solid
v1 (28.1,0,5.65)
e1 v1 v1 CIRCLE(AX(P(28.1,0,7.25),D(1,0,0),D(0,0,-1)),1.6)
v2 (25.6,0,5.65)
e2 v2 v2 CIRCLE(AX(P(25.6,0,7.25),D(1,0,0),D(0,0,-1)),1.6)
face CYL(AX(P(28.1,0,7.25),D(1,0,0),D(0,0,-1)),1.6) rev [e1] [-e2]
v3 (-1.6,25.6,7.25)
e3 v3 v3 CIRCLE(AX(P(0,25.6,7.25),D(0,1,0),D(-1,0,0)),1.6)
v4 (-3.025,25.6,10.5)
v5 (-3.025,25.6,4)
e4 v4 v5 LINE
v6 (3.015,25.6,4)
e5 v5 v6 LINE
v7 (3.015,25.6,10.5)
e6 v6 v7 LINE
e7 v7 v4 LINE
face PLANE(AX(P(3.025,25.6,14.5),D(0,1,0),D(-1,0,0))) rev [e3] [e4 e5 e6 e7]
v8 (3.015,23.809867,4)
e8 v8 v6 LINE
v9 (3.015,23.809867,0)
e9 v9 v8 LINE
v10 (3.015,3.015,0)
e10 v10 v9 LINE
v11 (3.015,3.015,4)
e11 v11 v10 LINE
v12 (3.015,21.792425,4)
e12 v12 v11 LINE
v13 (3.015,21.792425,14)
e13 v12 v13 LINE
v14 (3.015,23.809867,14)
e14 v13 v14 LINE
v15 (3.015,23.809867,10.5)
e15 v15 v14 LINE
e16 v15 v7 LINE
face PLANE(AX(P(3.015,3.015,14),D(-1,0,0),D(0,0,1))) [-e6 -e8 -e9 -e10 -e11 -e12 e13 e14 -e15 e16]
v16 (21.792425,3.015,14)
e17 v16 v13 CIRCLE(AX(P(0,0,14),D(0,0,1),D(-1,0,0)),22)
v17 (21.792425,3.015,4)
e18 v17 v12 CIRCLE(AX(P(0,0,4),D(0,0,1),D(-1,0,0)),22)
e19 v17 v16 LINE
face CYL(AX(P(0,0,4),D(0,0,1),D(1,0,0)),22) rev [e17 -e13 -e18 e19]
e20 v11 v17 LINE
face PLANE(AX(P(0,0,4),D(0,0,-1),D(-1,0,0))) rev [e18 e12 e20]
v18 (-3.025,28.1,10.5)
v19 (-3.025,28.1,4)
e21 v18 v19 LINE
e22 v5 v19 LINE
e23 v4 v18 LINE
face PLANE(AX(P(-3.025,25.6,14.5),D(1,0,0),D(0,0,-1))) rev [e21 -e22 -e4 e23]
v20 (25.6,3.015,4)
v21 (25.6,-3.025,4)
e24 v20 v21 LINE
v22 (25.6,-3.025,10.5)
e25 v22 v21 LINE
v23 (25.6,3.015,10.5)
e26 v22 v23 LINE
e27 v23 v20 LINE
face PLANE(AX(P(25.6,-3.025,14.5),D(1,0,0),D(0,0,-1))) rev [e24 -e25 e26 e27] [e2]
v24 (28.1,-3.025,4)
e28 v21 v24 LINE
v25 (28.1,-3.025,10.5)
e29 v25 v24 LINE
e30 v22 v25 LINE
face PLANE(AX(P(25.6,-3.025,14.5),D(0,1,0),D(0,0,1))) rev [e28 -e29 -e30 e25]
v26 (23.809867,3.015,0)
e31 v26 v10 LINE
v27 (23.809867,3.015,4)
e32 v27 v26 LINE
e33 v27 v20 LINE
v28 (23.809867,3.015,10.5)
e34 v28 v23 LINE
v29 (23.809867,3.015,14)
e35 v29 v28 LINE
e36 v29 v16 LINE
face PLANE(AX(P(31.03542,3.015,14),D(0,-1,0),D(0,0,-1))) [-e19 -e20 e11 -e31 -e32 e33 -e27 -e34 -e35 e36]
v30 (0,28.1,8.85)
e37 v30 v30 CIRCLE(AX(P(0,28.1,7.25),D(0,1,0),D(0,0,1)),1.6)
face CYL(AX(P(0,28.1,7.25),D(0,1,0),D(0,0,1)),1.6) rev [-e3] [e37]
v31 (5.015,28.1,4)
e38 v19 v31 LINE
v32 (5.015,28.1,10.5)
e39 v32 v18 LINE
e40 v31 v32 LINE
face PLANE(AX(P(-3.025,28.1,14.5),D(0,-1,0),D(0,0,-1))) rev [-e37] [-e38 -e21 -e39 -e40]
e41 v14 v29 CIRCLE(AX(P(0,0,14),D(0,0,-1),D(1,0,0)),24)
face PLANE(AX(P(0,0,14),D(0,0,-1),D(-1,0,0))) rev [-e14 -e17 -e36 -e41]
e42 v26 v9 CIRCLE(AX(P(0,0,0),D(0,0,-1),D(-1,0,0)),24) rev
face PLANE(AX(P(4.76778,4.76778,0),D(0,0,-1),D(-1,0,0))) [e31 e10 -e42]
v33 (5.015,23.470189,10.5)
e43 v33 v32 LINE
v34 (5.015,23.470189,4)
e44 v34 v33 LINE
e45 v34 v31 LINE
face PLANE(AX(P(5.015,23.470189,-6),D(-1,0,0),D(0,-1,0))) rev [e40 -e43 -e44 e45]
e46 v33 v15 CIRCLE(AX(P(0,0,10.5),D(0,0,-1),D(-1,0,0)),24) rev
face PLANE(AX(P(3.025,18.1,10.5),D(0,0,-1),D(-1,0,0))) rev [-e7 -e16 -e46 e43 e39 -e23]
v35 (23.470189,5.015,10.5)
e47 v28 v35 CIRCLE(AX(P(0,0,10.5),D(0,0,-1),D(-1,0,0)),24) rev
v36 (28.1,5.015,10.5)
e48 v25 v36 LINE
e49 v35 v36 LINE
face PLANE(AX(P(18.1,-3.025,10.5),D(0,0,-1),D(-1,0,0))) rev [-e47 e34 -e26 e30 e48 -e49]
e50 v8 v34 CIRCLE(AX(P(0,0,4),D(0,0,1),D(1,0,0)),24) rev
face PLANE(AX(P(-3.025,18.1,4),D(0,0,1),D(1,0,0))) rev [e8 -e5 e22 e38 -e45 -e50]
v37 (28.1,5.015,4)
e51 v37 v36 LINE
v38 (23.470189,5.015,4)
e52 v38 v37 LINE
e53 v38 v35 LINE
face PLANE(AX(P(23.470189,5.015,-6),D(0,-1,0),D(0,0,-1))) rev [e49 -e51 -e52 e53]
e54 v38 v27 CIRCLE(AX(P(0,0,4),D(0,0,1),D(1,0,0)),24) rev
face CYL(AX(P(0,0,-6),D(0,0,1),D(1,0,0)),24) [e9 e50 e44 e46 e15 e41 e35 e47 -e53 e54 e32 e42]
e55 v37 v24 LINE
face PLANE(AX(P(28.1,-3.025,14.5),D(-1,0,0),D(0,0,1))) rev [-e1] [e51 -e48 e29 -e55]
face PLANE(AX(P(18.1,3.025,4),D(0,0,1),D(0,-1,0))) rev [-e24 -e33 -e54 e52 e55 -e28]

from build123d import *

# Parameters (mm, degrees)
BOSS_EXTRUDE1_DEPTH   = 14.5
M3_CLEARANCE_HOLE1_D  = 3.2
M3_CLEARANCE_HOLE2_D  = 3.2
SKETCH6_W             = 6.05
SKETCH6_H             = 4
CUT_EXTRUDE1_DEPTH    = 10
SKETCH7_W             = 4
SKETCH7_H             = 6.05
CUT_EXTRUDE2_DEPTH    = 10
BOSS_EXTRUDE7_DEPTH   = 14
SKETCH14_W            = 57.002666796
SKETCH14_H            = 41.192482136
CUT_EXTRUDE4_DEPTH    = 15
CUT_EXTRUDE5_DEPTH    = 10
CUT_EXTRUDE8_DEPTH    = 20
CUT_EXTRUDE9_DEPTH    = 4
CUT_EXTRUDE9_START    = 10.5
CUT_EXTRUDE9_2_DEPTH  = 3.5
CUT_EXTRUDE10_DEPTH   = 4
CUT_EXTRUDE10_START   = 10.5
CUT_EXTRUDE10_2_DEPTH = 3.5


# Read off the part's stored shape, not the designer's step: Cut-Extrude9, Cut-Extrude10
with BuildPart() as part:
    # Sketch1 → Boss-Extrude1 (new body)
    with BuildSketch(Plane.XY):
        with BuildLine():
            Line((3.025, 25.6), (-3.025, 25.6))
            Line((-3.025, 25.6), (-3.025, 28.1))
            Line((-3.025, 28.1), (3.025, 28.1))
            ThreePointArc((3.025, 28.1), (21.312111091, 21.312111091), (28.1, 3.025))
            Line((28.1, 3.025), (28.1, -3.025))
            Line((28.1, -3.025), (25.6, -3.025))
            Line((25.6, -3.025), (25.6, 3.025))
            ThreePointArc((25.6, 3.025), (18.987935585, 18.987935585), (3.025, 25.6))
        make_face()
    extrude(amount=BOSS_EXTRUDE1_DEPTH)

    # M3 Clearance Hole1 (through all)
    with Locations(Plane(origin=(0, 28.1, 0), x_dir=(1, 0, 0), z_dir=(0, 1, 0))):
        with Locations((0, -7.25)):
            Hole(M3_CLEARANCE_HOLE1_D / 2)

    # M3 Clearance Hole2 (through all)
    with Locations(Plane(origin=(28.1, 0, 0), x_dir=(0, 0, -1), z_dir=(1, 0, 0))):
        with Locations((-7.25, 0)):
            Hole(M3_CLEARANCE_HOLE2_D / 2)

    # Sketch6 → Cut-Extrude1 (cut)
    with BuildSketch(Plane(origin=(0, 28.1, 0), x_dir=(1, 0, 0), z_dir=(0, 1, 0))):
        with Locations((0, -12.5)):
            Rectangle(SKETCH6_W, SKETCH6_H)
        with Locations((0, -2)):
            Rectangle(SKETCH6_W, SKETCH6_H)
    extrude(amount=-CUT_EXTRUDE1_DEPTH, mode=Mode.SUBTRACT)

    # Sketch7 → Cut-Extrude2 (cut)
    with BuildSketch(Plane(origin=(28.1, 0, 0), x_dir=(0, 0, -1), z_dir=(1, 0, 0))):
        with Locations((-12.5, 0)):
            Rectangle(SKETCH7_W, SKETCH7_H)
        with Locations((-2, 0)):
            Rectangle(SKETCH7_W, SKETCH7_H)
    extrude(amount=-CUT_EXTRUDE2_DEPTH, mode=Mode.SUBTRACT)

    # Sketch8 → Boss-Extrude7 (add)
    with BuildSketch(Plane(origin=(0, 0, 0), x_dir=(-1, 0, 0), z_dir=(0, 0, -1))):
        with BuildLine():
            Line((-31.03541973, 3.015), (-3.015, 3.015))
            Line((-3.015, 3.015), (-3.015, 31.03541973))
            ThreePointArc((-3.015, 31.03541973), (-22.048667792, 22.048667792), (-31.03541973, 3.015))
        make_face()
    extrude(amount=-BOSS_EXTRUDE7_DEPTH)

    # Sketch14 → Cut-Extrude4 (cut)
    with BuildSketch(Plane.XY.offset(14)):
        with Locations((13.446699297, 19.415661607)):
            Rectangle(SKETCH14_W, SKETCH14_H)
    extrude(amount=CUT_EXTRUDE4_DEPTH, mode=Mode.SUBTRACT)

    # Sketch15 → Cut-Extrude5 (cut)
    with BuildSketch(Plane.XY.offset(14)):
        with BuildLine():
            Line((3.015, 21.792424716), (3.015, 3.015))
            Line((3.015, 3.015), (21.792424716, 3.015))
            ThreePointArc((21.792424716, 3.015), (15.556349186, 15.556349186), (3.015, 21.792424716))
        make_face()
    extrude(amount=-CUT_EXTRUDE5_DEPTH, mode=Mode.SUBTRACT)

    # Sketch16 → Cut-Extrude8 (cut)
    with BuildSketch(Plane.XY.offset(14)):
        with BuildLine():
            Line((5.015, 23.47018907), (5.015, 28.1))
            Line((5.015, 28.1), (3.015, 28.1))
            Line((3.015, 28.1), (3.015, 36.20716296))
            Line((3.015, 36.20716296), (34.30048071, 28.1))
            Line((34.30048071, 28.1), (32.410436515, 3.015))
            Line((32.410436515, 3.015), (28.1, 3.015))
            Line((28.1, 3.015), (28.1, 5.015))
            Line((28.1, 5.015), (23.47018907, 5.015))
            ThreePointArc((23.47018907, 5.015), (16.970562748, 16.970562748), (5.015, 23.47018907))
        make_face()
    extrude(amount=-CUT_EXTRUDE8_DEPTH, mode=Mode.SUBTRACT)

    # Cut-Extrude9 outline → Cut-Extrude9 (cut)
    with BuildSketch(Plane.XY):
        with BuildLine():
            Line((28.1, 3.015), (28.1, 5.015))
            Line((28.1, 5.015), (23.47018907, 5.015))
            ThreePointArc((23.47018907, 5.015), (23.661169237, 4.018590587), (23.809867177, 3.015))
            Line((23.809867177, 3.015), (28.1, 3.015))
        make_face()
    extrude(amount=CUT_EXTRUDE9_DEPTH, mode=Mode.SUBTRACT)

    # Cut-Extrude9 2 outline → Cut-Extrude9 2 (cut)
    with BuildSketch(Plane.XY.offset(CUT_EXTRUDE9_START)):
        with BuildLine():
            Line((28.1, 3.015), (28.1, 5.015))
            Line((28.1, 5.015), (23.47018907, 5.015))
            ThreePointArc((23.47018907, 5.015), (23.661169237, 4.018590587), (23.809867177, 3.015))
            Line((23.809867177, 3.015), (28.1, 3.015))
        make_face()
    extrude(amount=CUT_EXTRUDE9_2_DEPTH, mode=Mode.SUBTRACT)

    # Cut-Extrude10 outline → Cut-Extrude10 (cut)
    with BuildSketch(Plane.XY):
        with BuildLine():
            Line((5.015, 28.1), (3.015, 28.1))
            Line((3.015, 28.1), (3.015, 23.809867177))
            ThreePointArc((3.015, 23.809867177), (4.018590587, 23.661169237), (5.015, 23.47018907))
            Line((5.015, 23.47018907), (5.015, 28.1))
        make_face()
    extrude(amount=CUT_EXTRUDE10_DEPTH, mode=Mode.SUBTRACT)

    # Cut-Extrude10 2 outline → Cut-Extrude10 2 (cut)
    with BuildSketch(Plane.XY.offset(CUT_EXTRUDE10_START)):
        with BuildLine():
            Line((5.015, 28.1), (3.015, 28.1))
            Line((3.015, 28.1), (3.015, 23.809867177))
            ThreePointArc((3.015, 23.809867177), (4.018590587, 23.661169237), (5.015, 23.47018907))
            Line((5.015, 23.47018907), (5.015, 28.1))
        make_face()
    extrude(amount=CUT_EXTRUDE10_2_DEPTH, mode=Mode.SUBTRACT)


solid = part.part
